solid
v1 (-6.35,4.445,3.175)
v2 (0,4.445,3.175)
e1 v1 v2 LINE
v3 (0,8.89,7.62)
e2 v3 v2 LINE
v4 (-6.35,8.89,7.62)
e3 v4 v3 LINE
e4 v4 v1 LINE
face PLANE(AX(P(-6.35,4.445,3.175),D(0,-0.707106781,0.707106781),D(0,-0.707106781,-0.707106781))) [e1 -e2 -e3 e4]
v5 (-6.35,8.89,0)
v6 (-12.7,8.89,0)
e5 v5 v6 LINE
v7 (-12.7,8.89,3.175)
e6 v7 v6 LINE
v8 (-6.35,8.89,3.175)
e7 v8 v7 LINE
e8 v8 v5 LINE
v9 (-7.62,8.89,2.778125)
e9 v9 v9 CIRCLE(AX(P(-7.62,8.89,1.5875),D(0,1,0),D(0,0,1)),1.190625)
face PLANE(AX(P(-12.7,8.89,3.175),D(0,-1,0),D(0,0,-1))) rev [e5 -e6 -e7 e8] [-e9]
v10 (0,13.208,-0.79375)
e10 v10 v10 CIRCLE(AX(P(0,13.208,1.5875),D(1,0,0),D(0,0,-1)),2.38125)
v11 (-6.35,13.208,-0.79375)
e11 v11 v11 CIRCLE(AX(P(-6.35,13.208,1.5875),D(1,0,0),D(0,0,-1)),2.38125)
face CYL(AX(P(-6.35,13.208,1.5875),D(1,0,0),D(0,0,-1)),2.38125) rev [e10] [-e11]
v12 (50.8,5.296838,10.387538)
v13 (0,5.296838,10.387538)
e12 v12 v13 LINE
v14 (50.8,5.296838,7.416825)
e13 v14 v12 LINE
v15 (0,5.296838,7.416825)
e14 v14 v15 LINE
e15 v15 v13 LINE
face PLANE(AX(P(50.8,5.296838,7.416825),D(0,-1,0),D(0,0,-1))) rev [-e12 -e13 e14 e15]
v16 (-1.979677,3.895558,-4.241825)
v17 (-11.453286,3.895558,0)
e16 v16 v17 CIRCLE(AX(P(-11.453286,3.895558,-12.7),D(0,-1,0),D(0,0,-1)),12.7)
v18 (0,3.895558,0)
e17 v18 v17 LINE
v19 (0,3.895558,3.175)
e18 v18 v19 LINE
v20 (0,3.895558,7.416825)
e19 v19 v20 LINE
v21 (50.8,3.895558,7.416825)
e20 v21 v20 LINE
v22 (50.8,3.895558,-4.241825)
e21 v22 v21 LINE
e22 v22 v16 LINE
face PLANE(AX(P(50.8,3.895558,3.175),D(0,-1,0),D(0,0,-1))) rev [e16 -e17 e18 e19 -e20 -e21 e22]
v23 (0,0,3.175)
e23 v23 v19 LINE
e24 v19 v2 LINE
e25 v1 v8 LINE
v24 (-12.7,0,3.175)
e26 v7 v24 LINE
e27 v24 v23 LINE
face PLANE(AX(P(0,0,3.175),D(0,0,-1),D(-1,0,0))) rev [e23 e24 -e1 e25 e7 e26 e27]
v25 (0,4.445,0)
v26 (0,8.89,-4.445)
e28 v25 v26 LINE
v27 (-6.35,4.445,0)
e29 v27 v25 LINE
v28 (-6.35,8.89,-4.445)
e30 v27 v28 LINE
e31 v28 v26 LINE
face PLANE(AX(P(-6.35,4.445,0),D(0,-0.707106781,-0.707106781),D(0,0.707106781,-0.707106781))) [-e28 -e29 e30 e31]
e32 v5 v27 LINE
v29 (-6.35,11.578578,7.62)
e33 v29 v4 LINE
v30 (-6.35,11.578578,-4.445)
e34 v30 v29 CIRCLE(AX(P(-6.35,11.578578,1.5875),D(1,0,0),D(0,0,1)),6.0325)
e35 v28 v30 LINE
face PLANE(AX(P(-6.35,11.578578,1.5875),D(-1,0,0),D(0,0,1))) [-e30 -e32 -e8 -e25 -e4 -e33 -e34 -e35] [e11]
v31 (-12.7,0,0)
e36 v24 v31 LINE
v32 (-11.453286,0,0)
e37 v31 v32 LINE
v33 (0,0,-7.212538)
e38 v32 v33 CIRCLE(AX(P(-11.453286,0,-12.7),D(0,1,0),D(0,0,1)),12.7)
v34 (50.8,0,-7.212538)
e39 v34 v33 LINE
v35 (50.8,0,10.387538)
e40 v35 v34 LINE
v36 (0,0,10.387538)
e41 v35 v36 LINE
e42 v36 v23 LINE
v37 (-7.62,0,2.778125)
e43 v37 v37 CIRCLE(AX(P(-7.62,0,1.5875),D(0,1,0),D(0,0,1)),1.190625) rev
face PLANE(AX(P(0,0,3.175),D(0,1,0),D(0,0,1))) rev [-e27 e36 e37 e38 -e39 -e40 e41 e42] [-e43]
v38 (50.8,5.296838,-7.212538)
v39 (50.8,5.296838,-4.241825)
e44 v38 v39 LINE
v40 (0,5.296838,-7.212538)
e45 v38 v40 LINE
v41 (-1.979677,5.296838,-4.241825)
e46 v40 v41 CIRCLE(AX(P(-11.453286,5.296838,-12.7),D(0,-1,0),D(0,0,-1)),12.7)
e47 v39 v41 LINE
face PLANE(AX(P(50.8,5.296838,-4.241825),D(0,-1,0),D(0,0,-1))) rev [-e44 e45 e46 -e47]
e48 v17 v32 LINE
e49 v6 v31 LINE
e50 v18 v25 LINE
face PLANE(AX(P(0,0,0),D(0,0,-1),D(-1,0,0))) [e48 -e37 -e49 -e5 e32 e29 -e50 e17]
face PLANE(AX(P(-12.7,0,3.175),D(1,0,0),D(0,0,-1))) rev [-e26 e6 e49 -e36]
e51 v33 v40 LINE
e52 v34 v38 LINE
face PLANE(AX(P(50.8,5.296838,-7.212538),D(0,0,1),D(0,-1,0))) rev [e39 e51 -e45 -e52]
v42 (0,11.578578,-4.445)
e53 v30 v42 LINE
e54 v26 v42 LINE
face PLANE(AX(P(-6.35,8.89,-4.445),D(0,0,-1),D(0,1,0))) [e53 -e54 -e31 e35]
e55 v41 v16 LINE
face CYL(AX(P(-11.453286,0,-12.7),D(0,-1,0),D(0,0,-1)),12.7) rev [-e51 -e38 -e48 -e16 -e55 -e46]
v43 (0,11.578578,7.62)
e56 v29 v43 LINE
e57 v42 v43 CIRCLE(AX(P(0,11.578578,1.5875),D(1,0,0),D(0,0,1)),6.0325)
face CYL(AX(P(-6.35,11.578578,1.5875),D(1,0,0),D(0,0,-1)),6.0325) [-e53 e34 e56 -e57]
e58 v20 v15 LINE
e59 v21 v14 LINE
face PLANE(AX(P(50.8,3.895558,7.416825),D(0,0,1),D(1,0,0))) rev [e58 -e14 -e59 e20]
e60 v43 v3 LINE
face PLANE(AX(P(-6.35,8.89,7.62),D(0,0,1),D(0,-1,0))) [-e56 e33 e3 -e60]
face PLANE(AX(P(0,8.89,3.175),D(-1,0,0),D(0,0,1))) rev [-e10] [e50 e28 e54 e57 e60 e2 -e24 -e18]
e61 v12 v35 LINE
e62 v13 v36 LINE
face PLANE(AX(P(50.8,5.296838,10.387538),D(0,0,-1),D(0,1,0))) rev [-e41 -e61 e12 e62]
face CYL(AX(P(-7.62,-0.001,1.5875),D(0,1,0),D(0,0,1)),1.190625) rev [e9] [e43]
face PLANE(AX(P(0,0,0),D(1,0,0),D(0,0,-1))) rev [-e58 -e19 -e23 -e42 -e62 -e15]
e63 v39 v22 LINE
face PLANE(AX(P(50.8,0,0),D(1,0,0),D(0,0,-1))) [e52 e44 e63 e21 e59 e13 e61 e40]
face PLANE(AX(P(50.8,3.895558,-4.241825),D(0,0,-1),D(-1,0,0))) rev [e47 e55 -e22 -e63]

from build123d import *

# Parameters (mm, degrees)
SKETCH1_W           = 12.7
SKETCH1_H           = 8.89
BOSS_EXTRUDE1_DEPTH = 3.175
SKETCH2_R           = 2.38125
BOSS_EXTRUDE2_DEPTH = 6.35
CUT_EXTRUDE1_REACH  = 19.274
SKETCH4_R           = 1.190625
BOSS_EXTRUDE3_DEPTH = 50.8
FILLET1_R           = 12.7


with BuildPart() as part:
    # Sketch1 → Boss-Extrude1 (new body)
    with BuildSketch(Plane.XY):
        with Locations((-6.35, 4.445)):
            Rectangle(SKETCH1_W, SKETCH1_H)
    extrude(amount=BOSS_EXTRUDE1_DEPTH)

    # Sketch2 → Boss-Extrude2 (add)
    with BuildSketch(Plane(origin=(0, 0, 0), x_dir=(0, 0, -1), z_dir=(1, 0, 0))):
        with BuildLine():
            Line((-3.175, 4.445), (-7.62, 8.89))
            Line((-7.62, 8.89), (-7.62, 11.578578051))
            ThreePointArc((-7.62, 11.578578051), (-1.5875, 17.611078051), (4.445, 11.578578051))
            Line((4.445, 11.578578051), (4.445, 8.89))
            Line((4.445, 8.89), (0, 4.445))
            Line((0, 4.445), (0, 8.89))
            Line((0, 8.89), (-3.175, 8.89))
            Line((-3.175, 8.89), (-3.175, 4.445))
        make_face()
        with Locations((-1.5875, 13.208)):
            Circle(SKETCH2_R, mode=Mode.SUBTRACT)
    extrude(amount=-BOSS_EXTRUDE2_DEPTH)

    # Sketch4 → Cut-Extrude1 (cut, up to next)
    with BuildSketch(Plane(origin=(0, 8.89, 0), x_dir=(1, 0, 0), z_dir=(0, 1, 0)), mode=Mode.PRIVATE) as cut_extrude1_sk1:
        with Locations(Location((-7.62, -1.5875, 0), (0, 0, 270))):
            Circle(SKETCH4_R)
    cut_extrude1_tool1 = extrude(cut_extrude1_sk1.sketch, amount=-CUT_EXTRUDE1_REACH, mode=Mode.PRIVATE) & part.part
    add(cut_extrude1_tool1.solids().sort_by_distance((-7.62, 8.89, 1.5875))[0], mode=Mode.SUBTRACT)

    # Sketch5 → Boss-Extrude3 (add)
    with BuildSketch(Plane(origin=(0, 0, 0), x_dir=(0, 0, -1), z_dir=(1, 0, 0))):
        Polygon((-7.416824551, 5.296838174), (-10.387538025, 5.296838174), (-10.387538025, 0), (0, 0), (7.212538025, 0), (7.212538025, 5.296838174), (4.241824551, 5.296838174), (4.241824551, 3.895558234), (0, 3.895558234), (-3.175, 3.895558234), (-7.416824551, 3.895558234), align=None)
    extrude(amount=BOSS_EXTRUDE3_DEPTH)

    # Fillet1
    # the kernel refuses this fillet: 12.7 mm, written as the material it adds along each edge
    with BuildSketch(Plane(origin=(0, 32.528773329, 0), x_dir=(-1, 0, 0), z_dir=(0, -1, 0))) as fillet1_piece_1_section:
        with BuildLine():
            CenterArc((11.453286038, 12.7), FILLET1_R, 205.599864758, 64.400135242)
            Line((0, 7.212538025), (0, 0))
            Line((0, 0), (11.453286038, 0))
        make_face()
    fillet1_piece_1 = extrude(amount=32.528773329, mode=Mode.PRIVATE)
    fillet1_piece_1 = split(fillet1_piece_1, bisect_by=Plane(origin=(-0.789431936, 5.296838174, -5.756080296), z_dir=(0, -1, 0)), keep=Keep.TOP, mode=Mode.PRIVATE)
    fillet1_piece_1 = split(fillet1_piece_1, bisect_by=Plane(origin=(-0.789431936, 4.596198204, -4.241824551), z_dir=(0, 0, -1)), keep=Keep.TOP, mode=Mode.PRIVATE)
    add(fillet1_piece_1)
    with BuildSketch(Plane(origin=(0, 3.895558234, 0), x_dir=(-1, 0, 0), z_dir=(0, -1, 0))) as fillet1_piece_2:
        with BuildLine():
            CenterArc((11.453286038, 12.7), FILLET1_R, 205.599864758, 64.400135242)
            Line((0, 7.212538025), (0, 0))
            Line((0, 0), (11.453286038, 0))
        make_face()
    extrude(amount=3.895558234)


solid = part.part
